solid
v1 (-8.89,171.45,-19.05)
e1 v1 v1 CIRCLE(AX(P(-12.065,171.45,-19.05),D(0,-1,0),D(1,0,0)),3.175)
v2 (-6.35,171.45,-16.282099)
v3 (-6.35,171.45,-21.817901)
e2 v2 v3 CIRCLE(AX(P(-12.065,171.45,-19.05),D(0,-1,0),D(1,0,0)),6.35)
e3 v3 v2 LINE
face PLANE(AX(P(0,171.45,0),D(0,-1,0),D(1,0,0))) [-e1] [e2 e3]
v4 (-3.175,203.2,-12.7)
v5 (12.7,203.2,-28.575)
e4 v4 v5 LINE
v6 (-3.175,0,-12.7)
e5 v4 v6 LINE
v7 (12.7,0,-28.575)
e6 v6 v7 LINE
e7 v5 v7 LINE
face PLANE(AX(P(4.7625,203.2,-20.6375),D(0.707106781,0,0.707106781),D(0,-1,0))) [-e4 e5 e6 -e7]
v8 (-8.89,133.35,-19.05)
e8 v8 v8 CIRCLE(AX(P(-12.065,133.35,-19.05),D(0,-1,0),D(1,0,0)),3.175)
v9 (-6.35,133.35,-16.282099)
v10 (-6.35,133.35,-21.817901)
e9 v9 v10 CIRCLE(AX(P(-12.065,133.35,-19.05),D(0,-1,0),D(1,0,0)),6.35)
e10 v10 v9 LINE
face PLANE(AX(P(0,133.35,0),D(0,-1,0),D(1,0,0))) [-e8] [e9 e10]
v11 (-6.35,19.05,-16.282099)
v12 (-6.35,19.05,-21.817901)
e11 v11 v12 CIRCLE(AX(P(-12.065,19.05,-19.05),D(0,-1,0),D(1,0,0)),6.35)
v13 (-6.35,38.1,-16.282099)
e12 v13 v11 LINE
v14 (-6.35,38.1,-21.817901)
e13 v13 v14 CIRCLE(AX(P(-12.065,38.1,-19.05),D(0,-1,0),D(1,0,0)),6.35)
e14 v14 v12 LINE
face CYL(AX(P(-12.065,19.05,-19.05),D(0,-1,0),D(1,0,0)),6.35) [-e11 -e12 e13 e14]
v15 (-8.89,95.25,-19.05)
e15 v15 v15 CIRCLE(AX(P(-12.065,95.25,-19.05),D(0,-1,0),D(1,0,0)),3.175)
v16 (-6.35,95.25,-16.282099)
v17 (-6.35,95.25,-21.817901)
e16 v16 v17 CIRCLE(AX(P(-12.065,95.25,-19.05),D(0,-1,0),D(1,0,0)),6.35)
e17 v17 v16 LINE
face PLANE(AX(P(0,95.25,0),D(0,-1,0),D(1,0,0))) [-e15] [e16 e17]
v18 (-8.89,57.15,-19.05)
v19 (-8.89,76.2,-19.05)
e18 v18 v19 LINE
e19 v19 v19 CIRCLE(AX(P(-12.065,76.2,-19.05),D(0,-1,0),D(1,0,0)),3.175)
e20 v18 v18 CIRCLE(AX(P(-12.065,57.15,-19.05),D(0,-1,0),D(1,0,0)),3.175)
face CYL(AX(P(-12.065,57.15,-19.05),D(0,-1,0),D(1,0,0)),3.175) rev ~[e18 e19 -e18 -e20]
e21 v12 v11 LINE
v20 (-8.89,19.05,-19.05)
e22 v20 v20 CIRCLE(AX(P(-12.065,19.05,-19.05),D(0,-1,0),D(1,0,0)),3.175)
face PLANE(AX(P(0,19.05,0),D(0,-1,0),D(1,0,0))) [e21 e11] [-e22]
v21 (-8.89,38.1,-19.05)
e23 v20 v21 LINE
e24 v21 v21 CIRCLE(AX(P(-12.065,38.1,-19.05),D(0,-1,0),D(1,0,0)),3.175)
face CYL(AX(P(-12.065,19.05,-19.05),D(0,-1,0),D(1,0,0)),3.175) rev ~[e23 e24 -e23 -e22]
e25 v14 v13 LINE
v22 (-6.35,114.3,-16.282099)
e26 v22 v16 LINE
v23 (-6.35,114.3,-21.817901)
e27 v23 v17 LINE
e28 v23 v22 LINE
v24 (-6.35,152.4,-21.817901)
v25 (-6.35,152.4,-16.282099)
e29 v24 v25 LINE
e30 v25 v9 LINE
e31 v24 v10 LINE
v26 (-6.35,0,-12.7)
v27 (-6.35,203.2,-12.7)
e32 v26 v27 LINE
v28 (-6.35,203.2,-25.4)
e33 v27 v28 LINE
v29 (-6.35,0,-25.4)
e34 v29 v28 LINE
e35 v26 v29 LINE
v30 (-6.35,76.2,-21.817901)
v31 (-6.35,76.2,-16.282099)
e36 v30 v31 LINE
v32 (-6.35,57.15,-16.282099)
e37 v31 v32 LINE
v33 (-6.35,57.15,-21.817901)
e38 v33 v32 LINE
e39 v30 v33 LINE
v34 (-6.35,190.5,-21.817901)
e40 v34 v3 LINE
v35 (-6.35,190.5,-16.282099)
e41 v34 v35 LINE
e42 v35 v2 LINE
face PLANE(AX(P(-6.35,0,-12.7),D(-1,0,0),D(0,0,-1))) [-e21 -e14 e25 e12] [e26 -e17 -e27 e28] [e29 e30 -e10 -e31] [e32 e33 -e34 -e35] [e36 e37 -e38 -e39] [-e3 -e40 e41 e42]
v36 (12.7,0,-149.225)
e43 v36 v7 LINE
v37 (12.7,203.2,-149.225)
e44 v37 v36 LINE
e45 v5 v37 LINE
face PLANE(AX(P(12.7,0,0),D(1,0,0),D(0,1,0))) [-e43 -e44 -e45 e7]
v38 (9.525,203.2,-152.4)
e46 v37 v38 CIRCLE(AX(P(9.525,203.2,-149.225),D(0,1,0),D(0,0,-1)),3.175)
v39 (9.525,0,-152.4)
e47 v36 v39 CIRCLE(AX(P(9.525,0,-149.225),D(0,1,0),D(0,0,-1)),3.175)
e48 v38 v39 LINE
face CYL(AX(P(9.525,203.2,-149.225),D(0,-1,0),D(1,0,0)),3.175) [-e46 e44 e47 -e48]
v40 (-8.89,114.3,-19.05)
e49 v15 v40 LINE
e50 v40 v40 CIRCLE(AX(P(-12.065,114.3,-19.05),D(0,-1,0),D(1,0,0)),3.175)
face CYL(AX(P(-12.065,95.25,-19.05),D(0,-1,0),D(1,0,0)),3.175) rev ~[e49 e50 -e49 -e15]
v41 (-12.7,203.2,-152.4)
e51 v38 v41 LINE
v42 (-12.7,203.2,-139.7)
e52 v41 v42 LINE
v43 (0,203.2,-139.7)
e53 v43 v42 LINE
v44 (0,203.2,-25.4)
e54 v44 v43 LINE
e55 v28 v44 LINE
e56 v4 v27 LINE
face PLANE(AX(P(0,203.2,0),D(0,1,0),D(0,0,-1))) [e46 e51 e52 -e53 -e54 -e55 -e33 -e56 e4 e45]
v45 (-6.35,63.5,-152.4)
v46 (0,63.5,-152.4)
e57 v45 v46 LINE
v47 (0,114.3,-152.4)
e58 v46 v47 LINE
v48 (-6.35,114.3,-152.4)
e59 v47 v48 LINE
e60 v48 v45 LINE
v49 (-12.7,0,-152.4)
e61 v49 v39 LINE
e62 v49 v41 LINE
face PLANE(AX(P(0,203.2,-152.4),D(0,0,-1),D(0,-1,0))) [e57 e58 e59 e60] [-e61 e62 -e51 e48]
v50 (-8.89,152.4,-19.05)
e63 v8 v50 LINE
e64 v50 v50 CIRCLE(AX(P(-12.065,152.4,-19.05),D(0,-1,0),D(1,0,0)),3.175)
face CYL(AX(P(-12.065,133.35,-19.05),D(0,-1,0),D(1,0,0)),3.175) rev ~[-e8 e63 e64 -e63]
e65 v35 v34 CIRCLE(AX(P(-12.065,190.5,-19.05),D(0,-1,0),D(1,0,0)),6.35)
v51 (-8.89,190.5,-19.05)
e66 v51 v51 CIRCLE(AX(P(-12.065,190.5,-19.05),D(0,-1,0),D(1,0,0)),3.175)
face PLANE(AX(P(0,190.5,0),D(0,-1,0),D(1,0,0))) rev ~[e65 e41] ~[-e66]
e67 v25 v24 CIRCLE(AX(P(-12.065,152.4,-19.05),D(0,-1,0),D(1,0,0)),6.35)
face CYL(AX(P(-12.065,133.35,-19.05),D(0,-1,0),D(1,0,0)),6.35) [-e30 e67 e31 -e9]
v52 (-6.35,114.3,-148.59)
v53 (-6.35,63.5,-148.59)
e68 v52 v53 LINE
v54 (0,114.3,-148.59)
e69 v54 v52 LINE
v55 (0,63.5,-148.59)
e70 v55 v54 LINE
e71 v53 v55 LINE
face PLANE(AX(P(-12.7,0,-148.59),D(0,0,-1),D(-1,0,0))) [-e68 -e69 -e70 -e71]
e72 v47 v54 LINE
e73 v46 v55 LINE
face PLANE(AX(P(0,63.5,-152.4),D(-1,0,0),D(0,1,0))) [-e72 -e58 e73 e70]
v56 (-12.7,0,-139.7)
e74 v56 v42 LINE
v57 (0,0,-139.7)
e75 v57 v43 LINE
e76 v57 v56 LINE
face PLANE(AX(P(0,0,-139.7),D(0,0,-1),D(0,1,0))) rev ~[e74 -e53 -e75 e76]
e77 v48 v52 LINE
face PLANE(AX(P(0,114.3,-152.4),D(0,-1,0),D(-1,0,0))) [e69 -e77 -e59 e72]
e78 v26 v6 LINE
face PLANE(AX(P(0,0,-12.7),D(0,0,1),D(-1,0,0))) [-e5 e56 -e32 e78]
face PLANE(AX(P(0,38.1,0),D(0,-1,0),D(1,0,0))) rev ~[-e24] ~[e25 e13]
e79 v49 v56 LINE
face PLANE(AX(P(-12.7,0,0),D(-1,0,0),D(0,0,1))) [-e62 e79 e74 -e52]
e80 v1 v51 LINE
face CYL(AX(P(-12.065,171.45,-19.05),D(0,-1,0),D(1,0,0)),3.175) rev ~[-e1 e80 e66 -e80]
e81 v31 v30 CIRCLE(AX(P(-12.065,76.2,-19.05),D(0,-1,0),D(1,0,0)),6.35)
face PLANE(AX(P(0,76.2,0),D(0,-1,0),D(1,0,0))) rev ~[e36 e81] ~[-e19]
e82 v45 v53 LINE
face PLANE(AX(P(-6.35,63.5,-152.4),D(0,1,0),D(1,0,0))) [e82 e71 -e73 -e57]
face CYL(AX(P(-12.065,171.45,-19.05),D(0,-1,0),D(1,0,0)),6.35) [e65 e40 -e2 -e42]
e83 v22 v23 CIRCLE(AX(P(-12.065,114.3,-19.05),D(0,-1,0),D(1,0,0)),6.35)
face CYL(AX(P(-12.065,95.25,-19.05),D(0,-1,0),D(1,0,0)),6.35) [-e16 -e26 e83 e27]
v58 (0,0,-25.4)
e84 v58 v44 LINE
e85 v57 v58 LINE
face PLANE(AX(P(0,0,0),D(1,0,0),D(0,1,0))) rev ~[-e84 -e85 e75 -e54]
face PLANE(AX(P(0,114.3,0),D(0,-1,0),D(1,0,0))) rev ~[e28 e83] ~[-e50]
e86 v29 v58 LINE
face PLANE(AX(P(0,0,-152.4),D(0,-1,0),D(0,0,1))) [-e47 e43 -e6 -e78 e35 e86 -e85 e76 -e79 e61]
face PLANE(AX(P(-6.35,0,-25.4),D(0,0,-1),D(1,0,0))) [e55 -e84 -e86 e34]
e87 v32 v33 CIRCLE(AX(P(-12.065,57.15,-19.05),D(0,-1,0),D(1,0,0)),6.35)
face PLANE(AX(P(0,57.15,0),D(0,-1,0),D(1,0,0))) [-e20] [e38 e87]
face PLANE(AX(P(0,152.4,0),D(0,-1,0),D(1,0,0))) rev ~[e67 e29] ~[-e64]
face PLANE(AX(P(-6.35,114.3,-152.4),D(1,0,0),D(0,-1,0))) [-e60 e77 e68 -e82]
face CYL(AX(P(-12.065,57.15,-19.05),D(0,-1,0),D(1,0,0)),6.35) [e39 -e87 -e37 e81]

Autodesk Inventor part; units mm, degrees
ref_plane "YZ Plane" through (0, 0, 0) normal (1, 0, 0) x (0, 1, 0)
ref_plane "XZ Plane" through (0, 0, 0) normal (0, 1, 0) x (-1, 0, 0)
sketch "Sketch1" plane through (0, 0, 0) normal (1, 0, 0) x (0, 1, 0)
  line L0 (0, 0) -> (203.2, 0)
  line L1 (203.2, 0) -> (203.2, -152.4)
  line L2 (203.2, -152.4) -> (0, -152.4)
  line L3 (0, -152.4) -> (0, 0)
  dimension "d0" = 203.2
  dimension "d1" = 152.4
extrude "Extrusion1" add sketch "Sketch1" along normal blind 12.7
sketch "Sketch2" plane through (0, 0, 0) normal (-1, 0, 0) x (0, 0, 1)
  line L0 (-152.4, 0) -> (-152.4, 203.2) projected
  line L1 (-152.4, 203.2) -> (0, 203.2) projected
  line L2 (-152.4, 0) -> (-139.7, 0)
  line L3 (-139.7, 0) -> (-139.7, 203.2)
  line L4 (-139.7, 203.2) -> (-152.4, 203.2)
  line L5 (-152.4, 203.2) -> (-152.4, 0)
  point P0 (0, 0)
  dimension "d4" = 12.7
extrude "Extrusion2" add sketch "Sketch2" along normal blind 12.7
fillet "Fillet1" radius 3.175 1 edges at (12.7, 101.6, -152.4)
sketch "Sketch3" plane through (0, 0, 0) normal (0, -1, 0) x (1, 0, 0)
  line L0 (0, 0) -> (0, -12.7)
  line L1 (0, -12.7) -> (0, -25.4)
  line L2 (0, -12.7) -> (-6.35, -12.7)
  line L3 (-6.35, -12.7) -> (-6.35, -25.4)
  line L4 (-6.35, -25.4) -> (0, -25.4)
  dimension "d8" = 12.7
  dimension "d9" = 12.7
  dimension "d10" = 6.35
  dimension "d11" = 90
extrude "Extrusion3" add sketch "Sketch3" against normal up to surface (203.2 mm away)
ref_plane "Work Plane1" through (0, 19.05, 0) normal (0, -1, 0) x (1, 0, 0)
sketch "Sketch4" plane through (0, 19.05, 0) normal (0, -1, 0) x (1, 0, 0)
  line L0 (0, -19.05) -> (-12.065, -19.05)
  circle A0 centre (-12.065, -19.05) radius 3.175
  circle A1 centre (-12.065, -19.05) radius 6.35
  point P0 (0, 0)
  dimension "d15" = 12.065
  dimension "d16" = 6.35
  dimension "d17" = 12.7
  dimension "d18" = 19.05
  dimension "d19" = 19.05
extrude "Extrusion4" add sketch "Sketch4" against normal blind 19.05
pattern_linear "Rectangular Pattern1" count 5 spacing 38.1 along (0, 1, 0) of "Extrusion4"
sketch "Sketch5" plane through (0, 203.2, 0) normal (0, 1, 0) x (1, 0, 0)
  line L0 (0, 0) -> (12.7, 0)
  line L1 (12.7, 0) -> (12.7, 12.7)
  line L2 (12.7, 12.7) -> (0, 12.7)
  line L3 (0, 12.7) -> (0, 0)
  line L4 (12.7, 149.225) -> (12.7, 0) projected
extrude "Extrusion5" cut sketch "Sketch5" against normal blind 203.2
chamfer "Chamfer2" distance 15.875 angle 45 1 edges at (12.7, 101.6, -12.7)
sketch "Sketch6" plane through (-12.7, 0, -152.4) normal (0, 0, -1) x (-1, 0, 0)
  line L0 (0, 0) -> (0, 63.5)
  line L1 (0, 63.5) -> (-6.35, 63.5)
  line L2 (-12.7, 0) -> (-12.7, 203.2) projected
  line L3 (-6.35, 63.5) -> (-12.7, 63.5)
  line L4 (-12.7, 63.5) -> (-12.7, 114.3)
  line L5 (-12.7, 114.3) -> (-6.35, 114.3)
  line L6 (-6.35, 114.3) -> (-6.35, 63.5)
  dimension "d35" = 63.5
  dimension "d37" = 6.35
  dimension "d38" = 50.8
extrude "Extrusion6" cut sketch "Sketch6" against normal blind 3.81
properties part number "PhoneSafeDoor(H)"
